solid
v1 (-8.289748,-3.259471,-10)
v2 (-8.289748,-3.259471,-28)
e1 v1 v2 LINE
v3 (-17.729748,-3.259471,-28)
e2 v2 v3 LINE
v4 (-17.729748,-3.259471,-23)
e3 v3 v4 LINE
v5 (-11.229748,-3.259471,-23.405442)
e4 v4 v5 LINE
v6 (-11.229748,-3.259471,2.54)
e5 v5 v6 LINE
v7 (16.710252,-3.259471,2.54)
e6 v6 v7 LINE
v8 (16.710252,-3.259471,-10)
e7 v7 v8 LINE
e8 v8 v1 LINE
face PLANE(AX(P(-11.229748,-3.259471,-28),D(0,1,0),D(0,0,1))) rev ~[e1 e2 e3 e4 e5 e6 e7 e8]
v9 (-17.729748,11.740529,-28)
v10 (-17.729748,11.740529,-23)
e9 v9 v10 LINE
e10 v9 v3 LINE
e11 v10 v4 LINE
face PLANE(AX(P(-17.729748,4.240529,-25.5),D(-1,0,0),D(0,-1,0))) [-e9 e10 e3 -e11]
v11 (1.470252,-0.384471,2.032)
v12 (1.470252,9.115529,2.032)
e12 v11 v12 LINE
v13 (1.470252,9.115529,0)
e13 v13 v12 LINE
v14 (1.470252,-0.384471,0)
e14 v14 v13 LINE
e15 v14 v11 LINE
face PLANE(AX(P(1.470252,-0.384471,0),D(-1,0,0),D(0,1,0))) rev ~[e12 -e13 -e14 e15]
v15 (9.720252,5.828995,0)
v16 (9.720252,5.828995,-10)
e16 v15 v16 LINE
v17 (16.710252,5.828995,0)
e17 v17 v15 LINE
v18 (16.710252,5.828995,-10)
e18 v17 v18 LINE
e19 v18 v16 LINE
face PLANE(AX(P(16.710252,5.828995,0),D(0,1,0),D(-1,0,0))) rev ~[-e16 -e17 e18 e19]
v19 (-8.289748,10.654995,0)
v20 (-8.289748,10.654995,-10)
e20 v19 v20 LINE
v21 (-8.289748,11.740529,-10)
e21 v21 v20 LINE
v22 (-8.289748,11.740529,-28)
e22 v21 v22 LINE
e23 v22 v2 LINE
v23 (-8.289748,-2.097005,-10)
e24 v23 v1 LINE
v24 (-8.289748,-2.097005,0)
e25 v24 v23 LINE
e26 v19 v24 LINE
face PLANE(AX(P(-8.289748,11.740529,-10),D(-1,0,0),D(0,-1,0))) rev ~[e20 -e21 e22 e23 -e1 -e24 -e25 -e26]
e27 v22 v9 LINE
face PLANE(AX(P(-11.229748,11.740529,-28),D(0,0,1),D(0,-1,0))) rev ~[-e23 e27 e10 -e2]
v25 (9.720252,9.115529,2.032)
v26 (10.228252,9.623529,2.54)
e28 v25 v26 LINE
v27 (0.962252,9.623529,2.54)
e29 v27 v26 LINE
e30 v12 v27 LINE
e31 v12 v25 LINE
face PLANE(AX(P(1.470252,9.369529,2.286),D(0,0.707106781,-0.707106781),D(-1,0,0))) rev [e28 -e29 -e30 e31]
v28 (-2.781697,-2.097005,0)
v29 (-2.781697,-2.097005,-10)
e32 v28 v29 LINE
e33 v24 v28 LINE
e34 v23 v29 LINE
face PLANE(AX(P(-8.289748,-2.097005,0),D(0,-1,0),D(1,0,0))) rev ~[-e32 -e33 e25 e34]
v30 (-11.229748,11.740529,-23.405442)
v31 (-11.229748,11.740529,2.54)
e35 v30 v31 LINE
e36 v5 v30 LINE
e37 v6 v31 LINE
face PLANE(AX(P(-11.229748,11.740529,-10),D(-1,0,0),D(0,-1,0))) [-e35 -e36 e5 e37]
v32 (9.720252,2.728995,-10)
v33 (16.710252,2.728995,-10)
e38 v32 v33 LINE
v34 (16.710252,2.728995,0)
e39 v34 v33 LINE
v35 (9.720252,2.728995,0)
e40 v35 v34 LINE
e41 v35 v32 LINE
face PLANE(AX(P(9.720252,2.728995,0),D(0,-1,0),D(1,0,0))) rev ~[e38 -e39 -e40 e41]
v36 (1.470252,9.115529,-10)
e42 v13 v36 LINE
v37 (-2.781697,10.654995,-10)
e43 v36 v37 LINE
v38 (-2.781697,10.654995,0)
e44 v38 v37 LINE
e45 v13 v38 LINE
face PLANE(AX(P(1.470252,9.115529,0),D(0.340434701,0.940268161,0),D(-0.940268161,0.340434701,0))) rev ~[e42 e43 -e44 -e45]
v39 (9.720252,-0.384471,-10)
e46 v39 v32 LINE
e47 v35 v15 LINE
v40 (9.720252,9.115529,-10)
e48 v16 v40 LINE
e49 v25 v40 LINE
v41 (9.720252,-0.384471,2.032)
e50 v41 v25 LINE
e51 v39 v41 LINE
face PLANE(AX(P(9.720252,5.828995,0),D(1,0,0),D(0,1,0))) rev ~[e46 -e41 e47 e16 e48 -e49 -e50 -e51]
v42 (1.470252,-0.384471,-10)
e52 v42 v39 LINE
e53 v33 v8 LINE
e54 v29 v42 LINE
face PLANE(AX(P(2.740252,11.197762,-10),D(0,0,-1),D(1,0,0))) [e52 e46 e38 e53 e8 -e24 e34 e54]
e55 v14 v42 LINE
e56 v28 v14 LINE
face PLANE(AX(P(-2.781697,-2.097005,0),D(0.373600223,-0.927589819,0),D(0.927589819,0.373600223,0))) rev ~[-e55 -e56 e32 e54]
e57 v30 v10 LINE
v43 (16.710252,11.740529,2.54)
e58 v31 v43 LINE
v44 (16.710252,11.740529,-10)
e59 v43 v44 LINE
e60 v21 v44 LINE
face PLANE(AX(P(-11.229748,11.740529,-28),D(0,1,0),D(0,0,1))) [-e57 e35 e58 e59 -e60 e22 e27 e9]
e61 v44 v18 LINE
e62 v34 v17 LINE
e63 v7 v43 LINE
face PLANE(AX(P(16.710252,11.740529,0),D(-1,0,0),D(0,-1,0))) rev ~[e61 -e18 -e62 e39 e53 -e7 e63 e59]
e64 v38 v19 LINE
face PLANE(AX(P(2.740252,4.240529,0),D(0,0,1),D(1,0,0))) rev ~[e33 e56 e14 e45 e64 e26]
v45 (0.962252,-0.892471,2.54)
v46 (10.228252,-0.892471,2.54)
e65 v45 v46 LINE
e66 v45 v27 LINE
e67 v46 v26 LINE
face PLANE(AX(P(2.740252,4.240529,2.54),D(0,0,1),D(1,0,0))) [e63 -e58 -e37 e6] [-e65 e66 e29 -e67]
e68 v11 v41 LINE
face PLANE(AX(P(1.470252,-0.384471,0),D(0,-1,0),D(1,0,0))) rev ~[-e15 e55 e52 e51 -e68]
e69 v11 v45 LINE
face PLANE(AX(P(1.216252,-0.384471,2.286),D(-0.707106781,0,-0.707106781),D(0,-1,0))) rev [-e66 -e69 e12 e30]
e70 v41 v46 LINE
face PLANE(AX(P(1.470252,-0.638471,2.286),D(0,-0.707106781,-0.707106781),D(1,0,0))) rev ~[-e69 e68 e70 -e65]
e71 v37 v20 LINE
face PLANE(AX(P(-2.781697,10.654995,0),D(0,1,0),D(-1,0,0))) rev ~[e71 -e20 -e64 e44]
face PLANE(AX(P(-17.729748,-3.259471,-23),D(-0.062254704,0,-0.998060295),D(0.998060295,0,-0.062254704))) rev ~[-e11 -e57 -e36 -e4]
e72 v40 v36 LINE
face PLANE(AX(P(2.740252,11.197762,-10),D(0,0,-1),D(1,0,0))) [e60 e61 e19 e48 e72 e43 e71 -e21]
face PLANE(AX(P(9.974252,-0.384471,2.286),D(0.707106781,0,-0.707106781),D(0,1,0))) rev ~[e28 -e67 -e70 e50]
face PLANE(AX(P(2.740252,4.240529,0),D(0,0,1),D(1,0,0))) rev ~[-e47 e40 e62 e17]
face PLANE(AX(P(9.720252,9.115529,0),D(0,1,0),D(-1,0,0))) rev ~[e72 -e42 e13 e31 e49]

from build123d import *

# Parameters (mm, degrees)
F0_W     = 27.94
F0_H     = 15
F0_W_2   = 8.25
F0_H_2   = 9.5
F1_DEPTH = 2.54
F2_W     = 1.7651973286
F2_H     = 4.826
F2_W_2   = 1.3194764033
F3_DEPTH = 10
F4_W     = 2.94
F4_H     = 15
F5_DEPTH = 18
F6_W     = 15
F6_H     = 5
F7_DEPTH = 6.5
F9_DEPTH = 25.4
F10_SIZE = 0.508


# Not quite as in the source:
# - a feature names something its author has since deleted; it is built from what else it names


with BuildPart() as f1:
    # F0 (on Top) → F1 (new body)
    with BuildSketch(Plane.XY):
        with Locations((2.7402517554, 4.2405291848)):
            Rectangle(F0_W, F0_H)
        with Locations((5.5952517554, 4.3655291848)):
            Rectangle(F0_W_2, F0_H_2, mode=Mode.SUBTRACT)
    extrude(amount=F1_DEPTH)

    # F2 (on face) → F3 (join)
    with BuildSketch(Plane(origin=(0, 0, 0), x_dir=(1, 0, 0), z_dir=(0, 0, -1))):
        Polygon((-11.2297482446, -11.7405291848), (16.7102517554, -11.7405291848), (16.7102517554, -10.6549952576), (14.9450544268, -10.6549952576), (13.6255780235, -10.6549952576), (-2.7816970833, -10.6549952576), (-8.2897482446, -10.6549952576), (-11.2297482446, -10.6549952576), align=None)
        with Locations((15.8276530911, -8.2419952576)):
            Rectangle(F2_W, F2_H)
        with Locations((15.8276530911, -0.3159952576)):
            Rectangle(F2_W, F2_H)
        Polygon((-2.7816970833, -10.6549952576), (13.6255780235, -10.6549952576), (13.6255780235, -5.8289952576), (9.7202517554, -5.8289952576), (9.7202517554, -9.1155291848), (1.4702517554, -9.1155291848), align=None)
        Polygon((-8.2897482446, 3.2594708152), (-8.2897482446, 2.0970047424), (-2.7816970833, 2.0970047424), (13.6255780235, 2.0970047424), (14.9450544268, 2.0970047424), (16.7102517554, 2.0970047424), (16.7102517554, 3.2594708152), align=None)
        Polygon((13.6255780235, 2.0970047424), (-2.7816970833, 2.0970047424), (1.4702517554, 0.3844708152), (9.7202517554, 0.3844708152), (9.7202517554, -2.7289952576), (13.6255780235, -2.7289952576), align=None)
        with Locations((14.2853162251, -8.2419952576)):
            Rectangle(F2_W_2, F2_H)
        with Locations((14.2853162251, -0.3159952576)):
            Rectangle(F2_W_2, F2_H)
        Polygon((-11.2297482446, 3.2594708152), (-11.2297482446, -10.6549952576), (-8.2897482446, -10.6549952576), (-8.2897482446, 2.0970047424), (-8.2897482446, 3.2594708152), align=None)
    extrude(amount=F3_DEPTH)

    # F4 (on face) → F5 (join)
    with BuildSketch(Plane(origin=(0, 0, -10), x_dir=(1, 0, 0), z_dir=(0, 0, -1))):
        with Locations((-9.7597482446, -4.2405291848)):
            Rectangle(F4_W, F4_H)
    extrude(amount=F5_DEPTH)

    # F6 (on face) → F7 (join)
    with BuildSketch(Plane(origin=(-11.2297482446, 0, 0), x_dir=(0, -1, 0), z_dir=(-1, 0, 0))):
        with Locations((-4.2405291848, -25.5)):
            Rectangle(F6_W, F6_H)
    extrude(amount=F7_DEPTH)

    # F8 (on face) → F9 (cut)
    with BuildSketch(Plane.XZ.offset(3.2594708152)):
        Polygon((-11.2297482446, -23), (-17.7297482446, -23), (-11.2297482446, -23.4054420143), align=None)
    extrude(amount=-F9_DEPTH, mode=Mode.SUBTRACT)

    # F10
    f10_edges = [f1.edges().sort_by_distance(p)[0] for p in [
        (1.470252, 4.365529, 2.54),
        (5.595252, 9.115529, 2.54),
        (9.720252, 4.365529, 2.54),
        (5.595252, -0.384471, 2.54),
    ]]
    chamfer(f10_edges, length=F10_SIZE)


solid = f1.part
